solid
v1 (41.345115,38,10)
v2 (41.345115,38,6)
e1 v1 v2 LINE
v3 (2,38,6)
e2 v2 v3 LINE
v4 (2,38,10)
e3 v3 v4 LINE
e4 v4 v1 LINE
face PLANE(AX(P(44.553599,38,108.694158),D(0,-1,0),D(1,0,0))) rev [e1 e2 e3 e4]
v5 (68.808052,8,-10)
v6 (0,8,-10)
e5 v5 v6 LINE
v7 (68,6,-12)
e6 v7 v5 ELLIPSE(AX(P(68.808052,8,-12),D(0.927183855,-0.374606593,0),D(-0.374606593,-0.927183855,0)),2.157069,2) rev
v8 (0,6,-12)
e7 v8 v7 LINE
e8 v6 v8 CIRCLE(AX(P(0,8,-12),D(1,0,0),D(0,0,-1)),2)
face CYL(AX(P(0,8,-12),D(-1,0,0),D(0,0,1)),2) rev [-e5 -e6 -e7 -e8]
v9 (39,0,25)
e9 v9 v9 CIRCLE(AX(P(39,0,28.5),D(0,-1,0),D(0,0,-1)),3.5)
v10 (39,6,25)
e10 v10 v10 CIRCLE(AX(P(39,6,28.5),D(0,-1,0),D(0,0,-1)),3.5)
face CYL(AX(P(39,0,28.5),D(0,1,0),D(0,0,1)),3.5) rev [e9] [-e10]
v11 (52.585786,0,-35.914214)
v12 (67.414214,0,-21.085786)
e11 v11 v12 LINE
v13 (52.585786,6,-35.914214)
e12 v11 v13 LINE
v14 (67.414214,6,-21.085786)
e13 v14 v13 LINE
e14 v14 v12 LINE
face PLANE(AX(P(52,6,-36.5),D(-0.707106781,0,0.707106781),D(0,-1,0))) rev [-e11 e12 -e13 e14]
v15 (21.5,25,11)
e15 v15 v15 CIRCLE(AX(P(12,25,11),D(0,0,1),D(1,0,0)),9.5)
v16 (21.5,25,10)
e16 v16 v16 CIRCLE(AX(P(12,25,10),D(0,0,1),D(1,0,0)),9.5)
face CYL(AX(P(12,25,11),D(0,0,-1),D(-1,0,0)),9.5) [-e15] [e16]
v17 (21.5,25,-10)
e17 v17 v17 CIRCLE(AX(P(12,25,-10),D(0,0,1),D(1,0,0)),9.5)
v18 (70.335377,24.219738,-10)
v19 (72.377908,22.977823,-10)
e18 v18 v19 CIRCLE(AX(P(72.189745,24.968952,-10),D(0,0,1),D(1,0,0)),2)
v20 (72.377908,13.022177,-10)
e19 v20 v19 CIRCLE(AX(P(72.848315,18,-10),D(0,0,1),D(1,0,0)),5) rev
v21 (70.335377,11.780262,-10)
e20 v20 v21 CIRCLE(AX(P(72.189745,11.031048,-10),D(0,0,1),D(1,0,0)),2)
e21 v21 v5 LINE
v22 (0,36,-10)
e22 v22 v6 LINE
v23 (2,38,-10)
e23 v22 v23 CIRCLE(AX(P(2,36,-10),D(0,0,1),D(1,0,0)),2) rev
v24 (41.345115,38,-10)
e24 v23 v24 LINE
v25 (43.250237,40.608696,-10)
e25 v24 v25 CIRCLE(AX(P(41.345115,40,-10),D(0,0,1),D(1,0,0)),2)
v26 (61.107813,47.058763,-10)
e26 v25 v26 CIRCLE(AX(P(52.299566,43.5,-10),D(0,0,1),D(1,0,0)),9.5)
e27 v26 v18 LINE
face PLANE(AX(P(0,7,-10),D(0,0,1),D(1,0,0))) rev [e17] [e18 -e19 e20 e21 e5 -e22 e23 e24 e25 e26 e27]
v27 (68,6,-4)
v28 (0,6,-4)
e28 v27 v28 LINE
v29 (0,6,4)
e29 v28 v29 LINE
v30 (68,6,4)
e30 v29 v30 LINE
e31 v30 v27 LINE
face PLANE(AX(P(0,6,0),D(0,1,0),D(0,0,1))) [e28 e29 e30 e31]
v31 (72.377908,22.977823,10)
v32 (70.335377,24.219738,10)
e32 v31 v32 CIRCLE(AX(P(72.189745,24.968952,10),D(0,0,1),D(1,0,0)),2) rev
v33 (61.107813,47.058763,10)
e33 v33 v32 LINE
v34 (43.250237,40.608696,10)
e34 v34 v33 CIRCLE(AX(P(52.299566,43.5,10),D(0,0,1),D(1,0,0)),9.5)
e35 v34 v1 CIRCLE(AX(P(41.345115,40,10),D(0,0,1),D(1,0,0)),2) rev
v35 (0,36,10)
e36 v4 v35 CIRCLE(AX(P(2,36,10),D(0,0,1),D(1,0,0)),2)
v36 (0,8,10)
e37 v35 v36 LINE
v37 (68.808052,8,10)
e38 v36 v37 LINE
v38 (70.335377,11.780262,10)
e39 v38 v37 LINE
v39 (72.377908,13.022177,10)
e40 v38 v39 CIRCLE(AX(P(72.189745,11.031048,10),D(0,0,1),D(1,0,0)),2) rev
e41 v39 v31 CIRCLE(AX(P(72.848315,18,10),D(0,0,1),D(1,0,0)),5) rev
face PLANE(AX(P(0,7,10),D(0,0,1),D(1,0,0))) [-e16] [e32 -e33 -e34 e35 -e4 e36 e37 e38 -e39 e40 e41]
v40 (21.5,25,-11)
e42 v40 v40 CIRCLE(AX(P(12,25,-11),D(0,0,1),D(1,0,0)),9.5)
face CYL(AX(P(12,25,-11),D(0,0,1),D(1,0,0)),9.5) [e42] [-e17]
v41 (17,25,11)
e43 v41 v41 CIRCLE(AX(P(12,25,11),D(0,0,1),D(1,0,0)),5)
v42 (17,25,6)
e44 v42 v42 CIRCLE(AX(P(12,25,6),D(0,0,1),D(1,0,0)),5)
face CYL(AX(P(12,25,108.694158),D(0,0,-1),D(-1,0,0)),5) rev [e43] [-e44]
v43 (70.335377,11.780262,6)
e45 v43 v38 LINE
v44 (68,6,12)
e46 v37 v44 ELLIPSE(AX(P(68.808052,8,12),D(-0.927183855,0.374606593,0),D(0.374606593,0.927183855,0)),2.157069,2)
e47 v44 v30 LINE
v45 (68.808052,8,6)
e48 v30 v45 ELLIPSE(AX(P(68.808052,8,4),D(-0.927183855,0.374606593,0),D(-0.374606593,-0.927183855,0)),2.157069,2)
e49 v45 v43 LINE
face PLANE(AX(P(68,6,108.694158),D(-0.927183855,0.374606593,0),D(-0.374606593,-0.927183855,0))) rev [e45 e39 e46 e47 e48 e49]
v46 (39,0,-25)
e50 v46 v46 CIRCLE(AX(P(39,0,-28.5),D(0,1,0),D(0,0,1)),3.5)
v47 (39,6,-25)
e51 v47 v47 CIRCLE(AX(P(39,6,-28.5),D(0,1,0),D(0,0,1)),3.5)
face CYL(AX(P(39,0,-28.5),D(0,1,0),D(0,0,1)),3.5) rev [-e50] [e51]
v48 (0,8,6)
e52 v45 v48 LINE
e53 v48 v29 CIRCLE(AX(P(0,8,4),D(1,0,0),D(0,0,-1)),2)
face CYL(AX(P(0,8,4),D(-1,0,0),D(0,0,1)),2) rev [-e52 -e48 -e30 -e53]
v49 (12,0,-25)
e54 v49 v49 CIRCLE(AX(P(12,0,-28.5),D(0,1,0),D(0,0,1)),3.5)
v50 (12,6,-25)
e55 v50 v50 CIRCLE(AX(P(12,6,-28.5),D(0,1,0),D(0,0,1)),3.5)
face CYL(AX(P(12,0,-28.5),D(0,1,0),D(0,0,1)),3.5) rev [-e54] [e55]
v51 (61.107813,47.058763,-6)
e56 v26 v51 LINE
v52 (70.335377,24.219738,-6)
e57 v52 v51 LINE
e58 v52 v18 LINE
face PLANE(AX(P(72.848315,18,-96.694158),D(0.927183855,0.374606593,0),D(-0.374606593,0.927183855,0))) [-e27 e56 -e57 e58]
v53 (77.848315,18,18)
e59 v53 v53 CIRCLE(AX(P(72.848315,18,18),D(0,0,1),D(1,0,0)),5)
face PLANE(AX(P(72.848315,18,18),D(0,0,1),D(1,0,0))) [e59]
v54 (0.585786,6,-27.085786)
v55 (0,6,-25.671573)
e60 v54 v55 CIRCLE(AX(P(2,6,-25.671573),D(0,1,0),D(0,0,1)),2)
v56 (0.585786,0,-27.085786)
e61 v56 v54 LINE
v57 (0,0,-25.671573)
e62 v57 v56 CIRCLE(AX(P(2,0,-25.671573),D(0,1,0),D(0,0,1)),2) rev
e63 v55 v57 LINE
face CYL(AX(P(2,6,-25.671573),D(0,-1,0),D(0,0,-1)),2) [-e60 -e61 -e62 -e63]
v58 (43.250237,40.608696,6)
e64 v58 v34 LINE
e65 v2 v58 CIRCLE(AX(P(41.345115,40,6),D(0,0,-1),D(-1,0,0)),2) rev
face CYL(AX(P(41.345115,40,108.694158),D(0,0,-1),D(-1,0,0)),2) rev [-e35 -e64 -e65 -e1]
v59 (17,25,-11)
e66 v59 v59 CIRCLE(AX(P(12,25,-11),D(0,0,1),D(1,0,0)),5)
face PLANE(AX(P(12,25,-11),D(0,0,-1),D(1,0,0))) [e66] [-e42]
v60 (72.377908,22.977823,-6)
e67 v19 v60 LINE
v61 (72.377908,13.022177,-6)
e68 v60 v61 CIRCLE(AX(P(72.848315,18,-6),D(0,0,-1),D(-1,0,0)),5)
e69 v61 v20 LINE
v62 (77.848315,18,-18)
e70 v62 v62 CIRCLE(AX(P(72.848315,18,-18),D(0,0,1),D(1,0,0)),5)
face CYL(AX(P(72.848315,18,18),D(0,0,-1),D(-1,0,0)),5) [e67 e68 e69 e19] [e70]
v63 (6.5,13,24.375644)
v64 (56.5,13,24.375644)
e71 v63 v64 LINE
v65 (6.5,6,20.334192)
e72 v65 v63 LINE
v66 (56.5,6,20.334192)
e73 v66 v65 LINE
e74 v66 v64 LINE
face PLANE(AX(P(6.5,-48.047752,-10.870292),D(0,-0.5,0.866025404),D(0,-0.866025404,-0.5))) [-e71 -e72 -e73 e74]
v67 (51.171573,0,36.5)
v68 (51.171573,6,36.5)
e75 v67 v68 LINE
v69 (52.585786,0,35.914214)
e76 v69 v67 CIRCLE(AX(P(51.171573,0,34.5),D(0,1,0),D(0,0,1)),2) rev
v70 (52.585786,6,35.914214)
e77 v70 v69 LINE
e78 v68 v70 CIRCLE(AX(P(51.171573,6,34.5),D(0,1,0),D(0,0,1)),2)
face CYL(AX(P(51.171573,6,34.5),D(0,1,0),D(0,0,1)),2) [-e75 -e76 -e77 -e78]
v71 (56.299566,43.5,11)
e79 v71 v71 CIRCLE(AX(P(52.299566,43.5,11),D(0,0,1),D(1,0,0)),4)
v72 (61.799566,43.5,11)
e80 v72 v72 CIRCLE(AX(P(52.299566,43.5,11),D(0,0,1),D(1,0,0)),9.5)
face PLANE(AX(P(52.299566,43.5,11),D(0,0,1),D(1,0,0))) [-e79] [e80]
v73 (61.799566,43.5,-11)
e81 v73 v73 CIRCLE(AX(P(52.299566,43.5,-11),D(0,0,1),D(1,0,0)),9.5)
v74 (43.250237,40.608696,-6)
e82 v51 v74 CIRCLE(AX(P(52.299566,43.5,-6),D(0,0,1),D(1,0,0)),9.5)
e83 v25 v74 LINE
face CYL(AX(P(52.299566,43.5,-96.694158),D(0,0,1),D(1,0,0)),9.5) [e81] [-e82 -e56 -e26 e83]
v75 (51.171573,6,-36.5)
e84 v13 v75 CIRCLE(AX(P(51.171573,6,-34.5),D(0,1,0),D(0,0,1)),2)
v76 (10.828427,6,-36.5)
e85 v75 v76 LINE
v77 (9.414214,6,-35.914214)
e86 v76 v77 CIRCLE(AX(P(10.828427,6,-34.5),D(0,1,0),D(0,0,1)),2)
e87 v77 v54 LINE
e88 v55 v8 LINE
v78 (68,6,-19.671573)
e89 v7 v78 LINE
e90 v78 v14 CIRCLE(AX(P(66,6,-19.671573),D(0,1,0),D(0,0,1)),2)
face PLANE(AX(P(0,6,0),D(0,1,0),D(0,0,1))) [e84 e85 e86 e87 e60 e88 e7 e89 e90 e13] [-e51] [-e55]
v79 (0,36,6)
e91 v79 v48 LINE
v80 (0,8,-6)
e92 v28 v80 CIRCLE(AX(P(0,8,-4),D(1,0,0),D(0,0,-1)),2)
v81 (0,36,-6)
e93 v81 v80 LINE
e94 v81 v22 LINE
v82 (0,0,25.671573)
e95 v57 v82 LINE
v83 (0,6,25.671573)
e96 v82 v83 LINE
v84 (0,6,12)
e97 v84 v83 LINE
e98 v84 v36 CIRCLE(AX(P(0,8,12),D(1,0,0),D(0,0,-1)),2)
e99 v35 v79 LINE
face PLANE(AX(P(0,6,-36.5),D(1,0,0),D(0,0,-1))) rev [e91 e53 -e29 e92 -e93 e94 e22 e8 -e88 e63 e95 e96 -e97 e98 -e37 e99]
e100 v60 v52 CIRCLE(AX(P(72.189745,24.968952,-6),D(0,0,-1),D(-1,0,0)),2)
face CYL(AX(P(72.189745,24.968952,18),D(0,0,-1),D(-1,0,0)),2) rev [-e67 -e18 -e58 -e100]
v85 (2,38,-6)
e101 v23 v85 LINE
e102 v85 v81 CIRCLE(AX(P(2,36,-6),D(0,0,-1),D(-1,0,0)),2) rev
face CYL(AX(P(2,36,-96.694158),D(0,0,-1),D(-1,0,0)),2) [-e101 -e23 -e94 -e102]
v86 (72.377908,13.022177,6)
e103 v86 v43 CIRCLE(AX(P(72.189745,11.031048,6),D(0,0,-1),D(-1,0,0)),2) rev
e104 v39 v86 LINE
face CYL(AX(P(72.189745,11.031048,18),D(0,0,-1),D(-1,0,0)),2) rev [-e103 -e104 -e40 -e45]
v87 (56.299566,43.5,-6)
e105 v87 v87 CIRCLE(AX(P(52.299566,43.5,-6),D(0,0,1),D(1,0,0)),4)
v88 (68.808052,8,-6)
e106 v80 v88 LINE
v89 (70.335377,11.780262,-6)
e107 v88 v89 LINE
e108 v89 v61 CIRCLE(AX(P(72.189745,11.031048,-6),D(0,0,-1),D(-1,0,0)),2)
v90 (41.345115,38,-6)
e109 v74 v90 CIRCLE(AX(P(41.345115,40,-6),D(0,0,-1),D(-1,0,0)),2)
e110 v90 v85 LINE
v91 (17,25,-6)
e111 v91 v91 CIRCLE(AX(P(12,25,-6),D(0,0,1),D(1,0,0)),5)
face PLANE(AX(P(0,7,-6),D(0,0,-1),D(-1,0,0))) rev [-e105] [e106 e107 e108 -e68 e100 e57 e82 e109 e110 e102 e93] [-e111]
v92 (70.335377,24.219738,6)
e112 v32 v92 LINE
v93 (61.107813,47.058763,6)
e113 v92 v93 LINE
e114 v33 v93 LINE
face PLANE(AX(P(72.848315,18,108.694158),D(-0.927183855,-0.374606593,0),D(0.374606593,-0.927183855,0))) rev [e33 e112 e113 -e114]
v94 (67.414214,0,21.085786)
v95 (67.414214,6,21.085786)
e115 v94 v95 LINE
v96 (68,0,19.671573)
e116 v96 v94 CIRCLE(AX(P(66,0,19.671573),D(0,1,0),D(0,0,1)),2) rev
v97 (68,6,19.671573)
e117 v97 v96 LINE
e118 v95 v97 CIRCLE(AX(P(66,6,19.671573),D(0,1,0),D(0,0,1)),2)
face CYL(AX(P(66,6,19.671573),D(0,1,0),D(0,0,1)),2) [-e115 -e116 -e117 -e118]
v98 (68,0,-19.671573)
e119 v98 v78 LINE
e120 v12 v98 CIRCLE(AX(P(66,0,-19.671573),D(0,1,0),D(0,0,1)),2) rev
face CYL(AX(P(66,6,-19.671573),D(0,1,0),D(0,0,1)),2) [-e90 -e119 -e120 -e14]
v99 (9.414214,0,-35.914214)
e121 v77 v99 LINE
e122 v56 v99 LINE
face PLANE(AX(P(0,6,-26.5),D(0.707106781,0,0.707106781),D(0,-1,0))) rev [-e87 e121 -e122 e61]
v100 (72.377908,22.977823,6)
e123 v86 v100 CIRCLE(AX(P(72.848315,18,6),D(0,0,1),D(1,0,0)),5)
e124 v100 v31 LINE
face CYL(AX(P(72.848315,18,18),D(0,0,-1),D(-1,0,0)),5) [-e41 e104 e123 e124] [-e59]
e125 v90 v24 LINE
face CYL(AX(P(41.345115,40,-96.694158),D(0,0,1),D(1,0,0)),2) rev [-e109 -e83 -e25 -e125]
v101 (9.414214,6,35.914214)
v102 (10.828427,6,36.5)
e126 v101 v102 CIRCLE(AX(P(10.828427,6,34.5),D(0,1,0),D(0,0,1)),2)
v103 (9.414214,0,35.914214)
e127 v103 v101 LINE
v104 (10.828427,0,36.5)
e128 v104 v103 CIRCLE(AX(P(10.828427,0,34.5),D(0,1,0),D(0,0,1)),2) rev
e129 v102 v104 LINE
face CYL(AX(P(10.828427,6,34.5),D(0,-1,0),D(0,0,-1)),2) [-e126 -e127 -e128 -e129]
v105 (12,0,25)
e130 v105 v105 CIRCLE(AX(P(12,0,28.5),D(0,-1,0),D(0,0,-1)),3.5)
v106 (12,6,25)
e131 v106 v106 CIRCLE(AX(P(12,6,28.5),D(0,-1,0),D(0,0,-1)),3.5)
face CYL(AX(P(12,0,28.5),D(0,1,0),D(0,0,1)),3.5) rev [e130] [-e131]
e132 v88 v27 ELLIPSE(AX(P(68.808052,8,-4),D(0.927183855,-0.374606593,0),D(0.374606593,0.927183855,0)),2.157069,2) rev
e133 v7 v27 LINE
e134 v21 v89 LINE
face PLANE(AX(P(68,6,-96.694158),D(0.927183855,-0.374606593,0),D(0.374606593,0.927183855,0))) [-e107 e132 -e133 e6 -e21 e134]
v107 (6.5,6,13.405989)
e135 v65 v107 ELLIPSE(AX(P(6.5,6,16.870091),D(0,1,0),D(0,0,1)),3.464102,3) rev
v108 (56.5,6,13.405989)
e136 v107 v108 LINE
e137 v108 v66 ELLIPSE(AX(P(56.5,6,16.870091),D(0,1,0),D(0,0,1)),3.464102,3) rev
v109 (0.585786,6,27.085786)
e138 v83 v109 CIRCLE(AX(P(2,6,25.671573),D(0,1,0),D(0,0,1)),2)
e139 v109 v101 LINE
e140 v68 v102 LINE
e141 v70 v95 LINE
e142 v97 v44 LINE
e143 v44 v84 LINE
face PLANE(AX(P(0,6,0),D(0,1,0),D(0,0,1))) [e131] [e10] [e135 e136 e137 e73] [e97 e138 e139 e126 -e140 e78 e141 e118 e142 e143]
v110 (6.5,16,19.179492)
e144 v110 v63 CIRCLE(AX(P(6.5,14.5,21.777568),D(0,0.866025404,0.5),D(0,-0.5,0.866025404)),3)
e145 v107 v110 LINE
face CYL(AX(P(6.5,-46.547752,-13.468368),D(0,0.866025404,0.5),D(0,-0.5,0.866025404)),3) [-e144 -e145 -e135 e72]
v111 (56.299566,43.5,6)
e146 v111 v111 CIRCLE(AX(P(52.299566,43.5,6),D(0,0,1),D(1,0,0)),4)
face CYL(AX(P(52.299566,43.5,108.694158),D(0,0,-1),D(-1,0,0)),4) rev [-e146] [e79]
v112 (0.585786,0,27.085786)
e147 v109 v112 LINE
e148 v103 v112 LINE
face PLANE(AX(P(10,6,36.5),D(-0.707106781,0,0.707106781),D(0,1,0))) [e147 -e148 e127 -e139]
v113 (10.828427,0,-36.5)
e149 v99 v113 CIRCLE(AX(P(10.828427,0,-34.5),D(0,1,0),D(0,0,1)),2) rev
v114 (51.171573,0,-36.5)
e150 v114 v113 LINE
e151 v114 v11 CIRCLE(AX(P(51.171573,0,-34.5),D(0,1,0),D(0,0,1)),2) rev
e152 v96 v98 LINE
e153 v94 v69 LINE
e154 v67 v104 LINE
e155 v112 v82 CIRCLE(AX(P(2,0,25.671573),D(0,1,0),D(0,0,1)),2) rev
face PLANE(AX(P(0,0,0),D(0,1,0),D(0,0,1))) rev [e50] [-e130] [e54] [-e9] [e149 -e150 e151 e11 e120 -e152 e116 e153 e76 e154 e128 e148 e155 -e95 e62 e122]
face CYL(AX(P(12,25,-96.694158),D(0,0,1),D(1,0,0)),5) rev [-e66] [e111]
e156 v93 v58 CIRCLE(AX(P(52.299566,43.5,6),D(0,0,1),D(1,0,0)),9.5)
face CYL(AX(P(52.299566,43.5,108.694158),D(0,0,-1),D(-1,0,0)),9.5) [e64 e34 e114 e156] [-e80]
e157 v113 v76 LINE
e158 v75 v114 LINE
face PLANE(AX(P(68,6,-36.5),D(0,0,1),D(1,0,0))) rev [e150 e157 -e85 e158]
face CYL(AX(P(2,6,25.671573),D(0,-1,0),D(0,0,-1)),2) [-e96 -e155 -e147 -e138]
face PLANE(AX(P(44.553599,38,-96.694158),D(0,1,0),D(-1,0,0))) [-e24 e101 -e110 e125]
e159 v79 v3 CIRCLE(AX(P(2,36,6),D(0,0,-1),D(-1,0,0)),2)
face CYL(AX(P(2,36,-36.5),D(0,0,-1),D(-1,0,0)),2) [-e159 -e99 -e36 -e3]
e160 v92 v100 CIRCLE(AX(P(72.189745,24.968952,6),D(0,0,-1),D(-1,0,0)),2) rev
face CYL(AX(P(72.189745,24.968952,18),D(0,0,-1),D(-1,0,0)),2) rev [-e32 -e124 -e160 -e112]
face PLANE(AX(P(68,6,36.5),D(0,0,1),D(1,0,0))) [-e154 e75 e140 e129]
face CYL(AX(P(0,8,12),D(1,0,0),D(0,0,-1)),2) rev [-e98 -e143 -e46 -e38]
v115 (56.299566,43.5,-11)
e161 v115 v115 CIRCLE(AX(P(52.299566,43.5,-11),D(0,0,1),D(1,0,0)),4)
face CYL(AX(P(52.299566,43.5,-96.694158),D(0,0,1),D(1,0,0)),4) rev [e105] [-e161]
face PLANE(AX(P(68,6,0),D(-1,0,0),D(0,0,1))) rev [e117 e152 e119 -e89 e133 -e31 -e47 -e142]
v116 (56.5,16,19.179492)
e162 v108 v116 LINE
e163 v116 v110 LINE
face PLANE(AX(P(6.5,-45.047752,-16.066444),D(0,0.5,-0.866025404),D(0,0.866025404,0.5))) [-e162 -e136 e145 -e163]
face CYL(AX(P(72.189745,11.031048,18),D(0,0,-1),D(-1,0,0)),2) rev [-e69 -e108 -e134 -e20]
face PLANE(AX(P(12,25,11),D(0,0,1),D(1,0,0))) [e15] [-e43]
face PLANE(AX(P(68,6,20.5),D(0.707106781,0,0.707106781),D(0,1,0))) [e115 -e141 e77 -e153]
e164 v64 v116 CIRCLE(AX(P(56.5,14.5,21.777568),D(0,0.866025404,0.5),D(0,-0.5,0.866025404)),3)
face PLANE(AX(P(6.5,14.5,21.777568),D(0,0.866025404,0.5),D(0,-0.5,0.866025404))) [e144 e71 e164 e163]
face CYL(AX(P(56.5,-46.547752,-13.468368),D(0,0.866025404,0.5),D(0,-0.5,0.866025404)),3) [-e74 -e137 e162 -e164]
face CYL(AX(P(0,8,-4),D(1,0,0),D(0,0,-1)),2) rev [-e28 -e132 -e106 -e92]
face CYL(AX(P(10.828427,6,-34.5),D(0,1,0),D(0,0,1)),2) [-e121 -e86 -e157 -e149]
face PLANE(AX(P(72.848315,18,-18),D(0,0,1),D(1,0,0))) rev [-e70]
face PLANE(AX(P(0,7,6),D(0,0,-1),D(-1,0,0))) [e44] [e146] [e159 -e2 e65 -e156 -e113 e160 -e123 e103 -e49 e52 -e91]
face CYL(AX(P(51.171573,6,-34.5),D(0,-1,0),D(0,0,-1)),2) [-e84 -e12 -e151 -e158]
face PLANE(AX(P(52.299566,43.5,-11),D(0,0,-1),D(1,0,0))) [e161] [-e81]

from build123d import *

# Parameters (mm, degrees)
SKETCH1_W           = 68
SKETCH1_H           = 36.5
BOSS_EXTRUDE1_DEPTH = 6
SKETCH2_R           = 3.5
CUT_EXTRUDE1_DEPTH  = 78.409624725
SKETCH3_W           = 68
SKETCH3_H           = 4
BOSS_EXTRUDE2_DEPTH = 1
SKETCH4_R           = 5
SKETCH4_R_2         = 4
BOSS_EXTRUDE3_DEPTH = 4
FILLET1_R           = 2
SKETCH5_R           = 9.5
SKETCH5_R_2         = 4
SKETCH5_R_3         = 5
BOSS_EXTRUDE4_DEPTH = 1
FILLET2_R           = 2
CHAMFER1_SIZE       = 10
CHAMFER2_SIZE       = 16
FILLET3_R           = 2
SKETCH7_R           = 5
BOSS_EXTRUDE6_DEPTH = 18
SKETCH8_W           = 25
SKETCH8_H           = 25
CUT_EXTRUDE2_DEPTH  = 12
FILLET8_R           = 2
BOSS_EXTRUDE8_REACH = 99.236


with BuildPart() as part:
    # Sketch1 → Boss-Extrude1 (new body)
    with BuildSketch(Plane(origin=(0, 0, 0), x_dir=(1, 0, 0), z_dir=(0, 1, 0))):
        with Locations((34, 18.25)):
            Rectangle(SKETCH1_W, SKETCH1_H)
    boss_extrude1 = extrude(amount=BOSS_EXTRUDE1_DEPTH)

    # Sketch2 → Cut-Extrude1 (cut, through all)
    with BuildSketch(Plane(origin=(0, 6, 0), x_dir=(1, 0, 0), z_dir=(0, 1, 0))):
        with Locations(Location((12, 28.5, 0), (0, 0, 270))):
            Circle(SKETCH2_R)
        with Locations(Location((39, 28.5, 0), (0, 0, 270))):
            Circle(SKETCH2_R)
    cut_extrude1 = extrude(amount=-CUT_EXTRUDE1_DEPTH, mode=Mode.SUBTRACT)

    # Sketch3 → Boss-Extrude2 (add)
    with BuildSketch(Plane(origin=(0, 6, 0), x_dir=(1, 0, 0), z_dir=(0, 1, 0))):
        with Locations((34, 8)):
            Rectangle(SKETCH3_W, SKETCH3_H)
    boss_extrude2 = extrude(amount=BOSS_EXTRUDE2_DEPTH)

    # Sketch4 → Boss-Extrude3 (add)
    with BuildSketch(Plane.XY.offset(-6)):
        with BuildLine():
            Line((68, 6), (72.84831471, 18))
            Line((72.84831471, 18), (61.107812514, 47.058762637))
            ThreePointArc((61.107812514, 47.058762637), (47.739148723, 51.833822365), (44.553599203, 38))
            Line((44.553599203, 38), (0, 38))
            Line((0, 38), (0, 6))
            Line((0, 6), (68, 6))
        make_face()
        with Locations((12, 25)):
            Circle(SKETCH4_R, mode=Mode.SUBTRACT)
        with Locations((52.299565896, 43.5)):
            Circle(SKETCH4_R_2, mode=Mode.SUBTRACT)
    boss_extrude3 = extrude(amount=-BOSS_EXTRUDE3_DEPTH)

    # Mirror1: Boss-Extrude1, Cut-Extrude1, Boss-Extrude2, Boss-Extrude3 across plane
    add(boss_extrude1.mirror(Plane.XY))
    add(cut_extrude1.mirror(Plane.XY), mode=Mode.SUBTRACT)
    add(boss_extrude2.mirror(Plane.XY))
    add(boss_extrude3.mirror(Plane.XY))

    # Fillet1
    fillet1_edges = [part.edges().sort_by_distance(p)[0] for p in [
        (34, 6, -6),
        (34, 6, -10),
        (34, 6, 6),
        (34, 6, 10),
    ]]
    fillet(fillet1_edges, radius=FILLET1_R)

    # Sketch5 → Boss-Extrude4 (add)
    # profile 1 of 2: a face of its own
    with BuildSketch(Plane.XY.offset(10)):
        with Locations(Location((52.299565896, 43.5, 0), (0, 0, 215.376540152))):
            Circle(SKETCH5_R)
        with Locations((52.299565896, 43.5)):
            Circle(SKETCH5_R_2, mode=Mode.SUBTRACT)
    # profile 2 of 2: a face of its own
    with BuildSketch(Plane.XY.offset(10)):
        with Locations((12, 25)):
            Circle(SKETCH5_R)
        with Locations((12, 25)):
            Circle(SKETCH5_R_3, mode=Mode.SUBTRACT)
    boss_extrude4 = extrude(amount=BOSS_EXTRUDE4_DEPTH)

    # Fillet2
    # the kernel refuses this fillet: 2 mm, written as the material it adds along each edge
    with BuildSketch(Plane(origin=(44.553599203, 38, -6), x_dir=(-0.4469432732557111, 0.8945623010676621, 0), z_dir=(0, 0, -1))) as fillet2_piece_1:
        with BuildLine():
            CenterArc((3.223135148, -1.976302693), FILLET2_R, 98.828804139, 107.718931873)
            Line((1.434010546, -2.870189239), (0, 0))
            ThreePointArc((0, 0), (1.458084948, -0.112562209), (2.916169896, 0))
        make_face()
    extrude(amount=4)
    with BuildSketch(Plane(origin=(44.553599203, 38, 6), x_dir=(-0.4469432732557111, 0.8945623010676621, 0), z_dir=(0, 0, 1))) as fillet2_piece_2:
        with BuildLine():
            CenterArc((3.223135148, 1.976302693), FILLET2_R, 153.452263987, 107.718931873)
            Line((1.434010546, 2.870189239), (0, 0))
            ThreePointArc((0, 0), (1.458084948, 0.112562209), (2.916169896, 0))
        make_face()
    extrude(amount=4)
    # the kernel refuses this fillet: 2 mm, written as the material it takes off along each edge
    with BuildSketch(Plane(origin=(0, 38, -1), x_dir=(0, -1, 0), z_dir=(0, 0, -1))) as fillet2_2_piece_1:
        with BuildLine():
            CenterArc((FILLET2_R, -FILLET2_R), FILLET2_R, 90, 90)
            Line((0, -FILLET2_R), (0, 0))
            Line((0, 0), (FILLET2_R, 0))
        make_face()
    extrude(amount=14, mode=Mode.SUBTRACT)
    with BuildSketch(Plane(origin=(0, 38, 1), x_dir=(0, -1, 0), z_dir=(0, 0, 1))) as fillet2_2_piece_2:
        with BuildLine():
            CenterArc((FILLET2_R, FILLET2_R), FILLET2_R, 180, 90)
            Line((0, FILLET2_R), (0, 0))
            Line((0, 0), (FILLET2_R, 0))
        make_face()
    extrude(amount=14, mode=Mode.SUBTRACT)

    # Chamfer1
    chamfer1_edges = [part.edges().sort_by_distance(p)[0] for p in [
        (0, 3, 36.5),
        (0, 3, -36.5),
    ]]
    chamfer(chamfer1_edges, length=CHAMFER1_SIZE)

    # Chamfer2
    chamfer2_edges = [part.edges().sort_by_distance(p)[0] for p in [
        (68, 3, 36.5),
        (68, 3, -36.5),
    ]]
    chamfer(chamfer2_edges, length=CHAMFER2_SIZE)

    # Fillet3
    fillet3_edges = [part.edges().sort_by_distance(p)[0] for p in [
        (10, 3, 36.5),
        (0, 3, -26.5),
        (0, 3, 26.5),
        (10, 3, -36.5),
        (68, 3, -20.5),
        (68, 3, 20.5),
        (52, 3, 36.5),
        (52, 3, -36.5),
    ]]
    fillet(fillet3_edges, radius=FILLET3_R)

    # Mirror2: Boss-Extrude4 across plane
    add(boss_extrude4.mirror(Plane.XY))

    # Sketch7 → Boss-Extrude6 (add, symmetric)
    with BuildSketch(Plane.XY):
        with Locations((72.84831471, 18)):
            Circle(SKETCH7_R)
    extrude(amount=BOSS_EXTRUDE6_DEPTH, both=True)

    # Sketch8 → Cut-Extrude2 (cut)
    with BuildSketch(Plane(origin=(0, 0, 6), x_dir=(-1, 0, 0), z_dir=(0, 0, -1))):
        with Locations((-70.130356493, 22.5)):
            Rectangle(SKETCH8_W, SKETCH8_H)
    extrude(amount=CUT_EXTRUDE2_DEPTH, mode=Mode.SUBTRACT)

    # Fillet8
    fillet8_edges = [part.edges().sort_by_distance(p)[0] for p in [
        (70.975281743, 22.635919273, 8),
        (70.975281743, 13.364080727, -8),
        (70.975281743, 22.635919273, -8),
        (70.975281743, 13.364080727, 8),
    ]]
    fillet(fillet8_edges, radius=FILLET8_R)

    # Boss-Extrude8: up to this plane
    boss_extrude8_end = Plane(origin=(0, 6, 0), z_dir=(0, 1, 0))
    # Sketch11 → Boss-Extrude8 (add, up to the surface)
    with BuildSketch(Plane(origin=(0, 20.304963619, 11.723076211), x_dir=(-1, 0, 0), z_dir=(0, 0.866025403784438, 0.500000000000001)), mode=Mode.PRIVATE) as boss_extrude8_sk1:
        with BuildLine():
            Line((-6.5, 8.609927238), (-56.5, 8.609927238))
            ThreePointArc((-56.5, 8.609927238), (-59.5, 11.609927238), (-56.5, 14.609927238))
            Line((-56.5, 14.609927238), (-6.5, 14.609927238))
            ThreePointArc((-6.5, 14.609927238), (-3.5, 11.609927238), (-6.5, 8.609927238))
        make_face()
    boss_extrude8_tool1 = split(extrude(boss_extrude8_sk1.sketch, amount=-BOSS_EXTRUDE8_REACH, mode=Mode.PRIVATE), bisect_by=boss_extrude8_end, keep=Keep.BOTH, mode=Mode.PRIVATE)
    add(boss_extrude8_tool1.solids().sort_by_distance((31.5, 14.5, 21.777568))[0])


solid = part.part
